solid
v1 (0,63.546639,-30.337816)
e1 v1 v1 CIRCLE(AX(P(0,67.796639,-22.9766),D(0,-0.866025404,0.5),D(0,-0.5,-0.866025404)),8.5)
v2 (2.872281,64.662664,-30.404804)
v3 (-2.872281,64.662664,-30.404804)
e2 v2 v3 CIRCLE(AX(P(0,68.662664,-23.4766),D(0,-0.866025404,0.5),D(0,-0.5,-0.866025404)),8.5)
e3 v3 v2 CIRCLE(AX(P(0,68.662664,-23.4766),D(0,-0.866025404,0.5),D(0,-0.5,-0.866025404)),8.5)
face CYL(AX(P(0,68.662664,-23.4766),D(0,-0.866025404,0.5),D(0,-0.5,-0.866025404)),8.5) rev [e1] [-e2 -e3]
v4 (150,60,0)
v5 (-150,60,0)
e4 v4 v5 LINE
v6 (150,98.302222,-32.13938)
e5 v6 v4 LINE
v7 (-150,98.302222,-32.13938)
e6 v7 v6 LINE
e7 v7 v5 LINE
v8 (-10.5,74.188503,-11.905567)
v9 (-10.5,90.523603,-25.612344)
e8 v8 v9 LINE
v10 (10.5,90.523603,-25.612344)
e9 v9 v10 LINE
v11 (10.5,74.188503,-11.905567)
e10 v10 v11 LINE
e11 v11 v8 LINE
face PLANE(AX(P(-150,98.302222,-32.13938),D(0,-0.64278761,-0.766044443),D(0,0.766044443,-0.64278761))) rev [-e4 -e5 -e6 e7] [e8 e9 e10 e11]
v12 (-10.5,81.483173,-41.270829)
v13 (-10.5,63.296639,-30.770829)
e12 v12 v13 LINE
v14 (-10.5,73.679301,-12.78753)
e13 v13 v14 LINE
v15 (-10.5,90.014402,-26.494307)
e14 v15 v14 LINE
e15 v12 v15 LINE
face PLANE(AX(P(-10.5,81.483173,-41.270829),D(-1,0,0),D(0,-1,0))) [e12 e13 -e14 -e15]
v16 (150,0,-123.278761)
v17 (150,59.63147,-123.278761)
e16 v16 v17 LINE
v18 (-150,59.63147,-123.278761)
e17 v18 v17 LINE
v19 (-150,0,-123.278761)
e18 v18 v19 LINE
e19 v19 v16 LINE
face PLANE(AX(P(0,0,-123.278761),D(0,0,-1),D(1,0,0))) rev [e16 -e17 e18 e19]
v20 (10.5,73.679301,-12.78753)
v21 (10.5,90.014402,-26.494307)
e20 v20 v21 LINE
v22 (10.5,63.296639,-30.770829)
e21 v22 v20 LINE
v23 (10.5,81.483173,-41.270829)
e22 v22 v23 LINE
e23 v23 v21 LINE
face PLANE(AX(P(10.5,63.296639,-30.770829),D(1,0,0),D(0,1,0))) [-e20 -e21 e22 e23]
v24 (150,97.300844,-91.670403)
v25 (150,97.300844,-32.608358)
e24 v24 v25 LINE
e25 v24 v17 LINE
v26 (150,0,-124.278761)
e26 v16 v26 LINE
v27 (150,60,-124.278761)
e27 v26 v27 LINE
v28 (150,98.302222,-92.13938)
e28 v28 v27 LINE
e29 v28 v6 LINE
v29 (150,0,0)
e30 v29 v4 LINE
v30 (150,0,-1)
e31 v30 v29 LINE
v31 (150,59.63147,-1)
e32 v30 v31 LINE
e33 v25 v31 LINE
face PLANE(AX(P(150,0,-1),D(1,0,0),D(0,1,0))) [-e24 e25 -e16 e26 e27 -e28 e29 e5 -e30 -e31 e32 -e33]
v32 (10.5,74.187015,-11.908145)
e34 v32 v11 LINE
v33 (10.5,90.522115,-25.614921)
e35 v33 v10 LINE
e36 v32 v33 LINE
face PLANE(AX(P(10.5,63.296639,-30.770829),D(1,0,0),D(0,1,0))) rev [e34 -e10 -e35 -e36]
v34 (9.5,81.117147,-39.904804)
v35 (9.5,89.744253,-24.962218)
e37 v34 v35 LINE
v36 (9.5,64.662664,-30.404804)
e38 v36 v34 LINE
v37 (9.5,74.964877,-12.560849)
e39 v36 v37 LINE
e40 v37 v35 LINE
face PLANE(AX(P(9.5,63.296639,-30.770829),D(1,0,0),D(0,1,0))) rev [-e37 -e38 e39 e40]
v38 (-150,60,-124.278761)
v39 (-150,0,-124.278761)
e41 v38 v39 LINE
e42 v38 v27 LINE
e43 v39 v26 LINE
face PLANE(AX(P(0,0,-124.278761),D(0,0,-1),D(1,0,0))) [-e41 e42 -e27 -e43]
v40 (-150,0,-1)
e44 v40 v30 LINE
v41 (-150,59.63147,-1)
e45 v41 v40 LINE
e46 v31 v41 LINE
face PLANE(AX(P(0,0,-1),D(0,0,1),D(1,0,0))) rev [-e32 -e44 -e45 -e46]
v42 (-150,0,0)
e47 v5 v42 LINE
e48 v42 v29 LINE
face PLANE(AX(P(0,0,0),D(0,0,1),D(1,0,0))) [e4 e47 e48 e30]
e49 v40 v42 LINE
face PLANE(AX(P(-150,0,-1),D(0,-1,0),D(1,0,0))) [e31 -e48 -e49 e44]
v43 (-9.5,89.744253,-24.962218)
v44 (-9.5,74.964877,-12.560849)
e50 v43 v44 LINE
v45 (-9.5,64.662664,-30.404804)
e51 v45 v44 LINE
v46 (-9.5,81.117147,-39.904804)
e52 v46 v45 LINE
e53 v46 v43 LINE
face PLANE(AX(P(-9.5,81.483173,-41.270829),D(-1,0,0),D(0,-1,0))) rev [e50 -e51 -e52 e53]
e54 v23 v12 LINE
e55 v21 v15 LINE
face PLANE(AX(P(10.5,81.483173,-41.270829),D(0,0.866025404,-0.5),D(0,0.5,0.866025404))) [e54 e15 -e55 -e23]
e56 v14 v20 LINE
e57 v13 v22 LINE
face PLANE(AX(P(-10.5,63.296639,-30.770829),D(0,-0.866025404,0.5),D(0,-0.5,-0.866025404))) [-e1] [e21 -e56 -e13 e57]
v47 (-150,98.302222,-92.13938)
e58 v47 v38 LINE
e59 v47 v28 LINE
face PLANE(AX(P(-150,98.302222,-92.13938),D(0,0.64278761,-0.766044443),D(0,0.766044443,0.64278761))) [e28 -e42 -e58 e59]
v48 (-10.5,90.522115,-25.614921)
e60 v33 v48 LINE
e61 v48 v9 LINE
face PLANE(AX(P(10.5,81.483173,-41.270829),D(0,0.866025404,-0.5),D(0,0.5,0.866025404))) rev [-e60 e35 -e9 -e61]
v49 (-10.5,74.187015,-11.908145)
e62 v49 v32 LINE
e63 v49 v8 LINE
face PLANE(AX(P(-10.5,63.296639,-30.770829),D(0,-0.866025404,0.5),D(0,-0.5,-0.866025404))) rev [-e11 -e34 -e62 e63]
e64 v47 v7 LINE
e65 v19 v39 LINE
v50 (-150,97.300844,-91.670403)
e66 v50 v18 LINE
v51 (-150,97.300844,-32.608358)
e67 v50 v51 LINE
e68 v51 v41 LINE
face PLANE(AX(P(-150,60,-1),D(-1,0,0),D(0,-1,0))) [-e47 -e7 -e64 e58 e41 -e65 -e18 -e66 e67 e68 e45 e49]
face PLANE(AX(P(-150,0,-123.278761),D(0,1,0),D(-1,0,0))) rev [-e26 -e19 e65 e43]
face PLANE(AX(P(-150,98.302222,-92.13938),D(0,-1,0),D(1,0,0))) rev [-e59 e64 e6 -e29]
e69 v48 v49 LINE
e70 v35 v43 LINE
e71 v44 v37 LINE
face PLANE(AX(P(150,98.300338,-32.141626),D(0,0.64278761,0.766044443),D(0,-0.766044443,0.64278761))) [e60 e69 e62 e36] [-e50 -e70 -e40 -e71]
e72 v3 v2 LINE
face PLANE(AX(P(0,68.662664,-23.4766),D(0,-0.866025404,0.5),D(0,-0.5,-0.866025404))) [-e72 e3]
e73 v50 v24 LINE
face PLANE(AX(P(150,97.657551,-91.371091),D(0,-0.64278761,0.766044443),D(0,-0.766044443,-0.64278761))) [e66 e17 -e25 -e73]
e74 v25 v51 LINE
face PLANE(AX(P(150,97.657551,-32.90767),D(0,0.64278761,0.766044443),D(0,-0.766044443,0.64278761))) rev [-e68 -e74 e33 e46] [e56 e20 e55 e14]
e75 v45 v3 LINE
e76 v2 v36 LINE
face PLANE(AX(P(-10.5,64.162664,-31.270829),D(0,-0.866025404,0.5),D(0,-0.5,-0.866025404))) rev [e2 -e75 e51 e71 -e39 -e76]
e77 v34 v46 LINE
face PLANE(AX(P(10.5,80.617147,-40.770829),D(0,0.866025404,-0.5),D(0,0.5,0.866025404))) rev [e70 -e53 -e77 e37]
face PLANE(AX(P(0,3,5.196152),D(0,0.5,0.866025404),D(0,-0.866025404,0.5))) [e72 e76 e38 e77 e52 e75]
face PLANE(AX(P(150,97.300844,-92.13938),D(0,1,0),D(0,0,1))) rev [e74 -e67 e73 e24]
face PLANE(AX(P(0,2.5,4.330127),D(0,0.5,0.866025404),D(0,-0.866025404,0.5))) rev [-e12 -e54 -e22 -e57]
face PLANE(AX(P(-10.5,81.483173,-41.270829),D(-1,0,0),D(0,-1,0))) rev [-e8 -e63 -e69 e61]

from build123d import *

# Parameters (mm, degrees)
SKETCH_1_W          = 300
SKETCH_1_H          = 60
EXTRUDE_1_DEPTH     = 1
SKETCH_4_W          = 300
SKETCH_4_H          = 1.002930946
EXTRUDE_2_DEPTH     = 50
SKETCH_5_W          = 300
SKETCH_5_H          = 1.001378412
EXTRUDE_3_DEPTH     = 60
SKETCH_11_W         = 21
SKETCH_11_H         = 21
EXTRUDE_5_DEPTH     = 25
SHELL_START         = -9.5
SHELL_1_DEPTH       = 19
SHELL_START_2       = -10.5
SHELL_1_2_DEPTH     = 21
SKETCH_12_R         = 8.5
CUT_EXTRUDE_4_DEPTH = 1


# Read off the part's stored shape, not the designer's step: 抽壳1
with BuildPart() as part:
    # 草图1 → 凸台-拉伸1 (new body)
    with BuildSketch(Plane.XY):
        with Locations((0, 30)):
            Rectangle(SKETCH_1_W, SKETCH_1_H)
    extrude_1 = extrude(amount=-EXTRUDE_1_DEPTH)

    # 草图4 → 凸台-拉伸2 (add)
    with BuildSketch(Plane(origin=(0, 35.20944533, -29.54423259), x_dir=(-1, 0, 0), z_dir=(0, 0.7660444431189771, -0.6427876096865406))):
        with Locations((0, 38.065791108)):
            Rectangle(SKETCH_4_W, SKETCH_4_H)
    extrude_2 = extrude(amount=EXTRUDE_2_DEPTH)

    # 草图5 → 凸台-拉伸3 (add)
    with BuildSketch(Plane(origin=(0, 0, -32.139380484), x_dir=(-1, 0, 0), z_dir=(0, 0, -1))):
        with Locations((0, 97.80153295)):
            Rectangle(SKETCH_5_W, SKETCH_5_H)
    extrude(amount=EXTRUDE_3_DEPTH)

    # 镜向1: 凸台-拉伸2 across plane
    add(extrude_2.mirror(Plane.XY.offset(-62.139380484)))

    # 镜向2: 凸台-拉伸1 across plane
    add(extrude_1.mirror(Plane.XY.offset(-62.139380484)))

    # 草图11 → 凸台-拉伸5 (add)
    with BuildSketch(Plane(origin=(0, 15, 25.980762114), x_dir=(-1, 0, 0), z_dir=(0, 0.500000000000001, 0.8660254037844382))):
        with Locations((0, -80.701911878)):
            Rectangle(SKETCH_11_W, SKETCH_11_H)
    extrude(amount=-EXTRUDE_5_DEPTH)

    # 抽壳1 outline → 抽壳1 (cut)
    with BuildSketch(Plane.YZ.offset(SHELL_START)):
        Polygon((89.744253028, -24.962217823), (90.522114942, -25.614921468), (90.523603022, -25.612344038), (93.98317256, -19.620193825), (75.79663908, -9.120193825), (74.18850284, -11.9055675), (74.187014759, -11.90814493), (74.964876673, -12.560848575), (64.662664484, -30.404803516), (81.117147156, -39.904803516), align=None)
    extrude(amount=SHELL_1_DEPTH, mode=Mode.SUBTRACT)

    # Shell 1 2 outline → Shell 1 2 (cut)
    with BuildSketch(Plane.YZ.offset(SHELL_START_2)):
        Polygon((74.187014759, -11.90814493), (90.522114942, -25.614921468), (90.523603022, -25.612344038), (93.98317256, -19.620193825), (75.79663908, -9.120193825), (74.18850284, -11.9055675), align=None)
    extrude(amount=SHELL_1_2_DEPTH, mode=Mode.SUBTRACT)

    # 草图12 → 切除-拉伸4 (cut)
    with BuildSketch(Plane(origin=(0, 60.79663908, -35.100955939), x_dir=(1, 0, 0), z_dir=(0, -0.8660254037844382, 0.5000000000000011))):
        with Locations(Location((0, 14, 0), (0, 0, 270))):
            Circle(SKETCH_12_R)
    extrude(amount=-CUT_EXTRUDE_4_DEPTH, mode=Mode.SUBTRACT)


solid = part.part
